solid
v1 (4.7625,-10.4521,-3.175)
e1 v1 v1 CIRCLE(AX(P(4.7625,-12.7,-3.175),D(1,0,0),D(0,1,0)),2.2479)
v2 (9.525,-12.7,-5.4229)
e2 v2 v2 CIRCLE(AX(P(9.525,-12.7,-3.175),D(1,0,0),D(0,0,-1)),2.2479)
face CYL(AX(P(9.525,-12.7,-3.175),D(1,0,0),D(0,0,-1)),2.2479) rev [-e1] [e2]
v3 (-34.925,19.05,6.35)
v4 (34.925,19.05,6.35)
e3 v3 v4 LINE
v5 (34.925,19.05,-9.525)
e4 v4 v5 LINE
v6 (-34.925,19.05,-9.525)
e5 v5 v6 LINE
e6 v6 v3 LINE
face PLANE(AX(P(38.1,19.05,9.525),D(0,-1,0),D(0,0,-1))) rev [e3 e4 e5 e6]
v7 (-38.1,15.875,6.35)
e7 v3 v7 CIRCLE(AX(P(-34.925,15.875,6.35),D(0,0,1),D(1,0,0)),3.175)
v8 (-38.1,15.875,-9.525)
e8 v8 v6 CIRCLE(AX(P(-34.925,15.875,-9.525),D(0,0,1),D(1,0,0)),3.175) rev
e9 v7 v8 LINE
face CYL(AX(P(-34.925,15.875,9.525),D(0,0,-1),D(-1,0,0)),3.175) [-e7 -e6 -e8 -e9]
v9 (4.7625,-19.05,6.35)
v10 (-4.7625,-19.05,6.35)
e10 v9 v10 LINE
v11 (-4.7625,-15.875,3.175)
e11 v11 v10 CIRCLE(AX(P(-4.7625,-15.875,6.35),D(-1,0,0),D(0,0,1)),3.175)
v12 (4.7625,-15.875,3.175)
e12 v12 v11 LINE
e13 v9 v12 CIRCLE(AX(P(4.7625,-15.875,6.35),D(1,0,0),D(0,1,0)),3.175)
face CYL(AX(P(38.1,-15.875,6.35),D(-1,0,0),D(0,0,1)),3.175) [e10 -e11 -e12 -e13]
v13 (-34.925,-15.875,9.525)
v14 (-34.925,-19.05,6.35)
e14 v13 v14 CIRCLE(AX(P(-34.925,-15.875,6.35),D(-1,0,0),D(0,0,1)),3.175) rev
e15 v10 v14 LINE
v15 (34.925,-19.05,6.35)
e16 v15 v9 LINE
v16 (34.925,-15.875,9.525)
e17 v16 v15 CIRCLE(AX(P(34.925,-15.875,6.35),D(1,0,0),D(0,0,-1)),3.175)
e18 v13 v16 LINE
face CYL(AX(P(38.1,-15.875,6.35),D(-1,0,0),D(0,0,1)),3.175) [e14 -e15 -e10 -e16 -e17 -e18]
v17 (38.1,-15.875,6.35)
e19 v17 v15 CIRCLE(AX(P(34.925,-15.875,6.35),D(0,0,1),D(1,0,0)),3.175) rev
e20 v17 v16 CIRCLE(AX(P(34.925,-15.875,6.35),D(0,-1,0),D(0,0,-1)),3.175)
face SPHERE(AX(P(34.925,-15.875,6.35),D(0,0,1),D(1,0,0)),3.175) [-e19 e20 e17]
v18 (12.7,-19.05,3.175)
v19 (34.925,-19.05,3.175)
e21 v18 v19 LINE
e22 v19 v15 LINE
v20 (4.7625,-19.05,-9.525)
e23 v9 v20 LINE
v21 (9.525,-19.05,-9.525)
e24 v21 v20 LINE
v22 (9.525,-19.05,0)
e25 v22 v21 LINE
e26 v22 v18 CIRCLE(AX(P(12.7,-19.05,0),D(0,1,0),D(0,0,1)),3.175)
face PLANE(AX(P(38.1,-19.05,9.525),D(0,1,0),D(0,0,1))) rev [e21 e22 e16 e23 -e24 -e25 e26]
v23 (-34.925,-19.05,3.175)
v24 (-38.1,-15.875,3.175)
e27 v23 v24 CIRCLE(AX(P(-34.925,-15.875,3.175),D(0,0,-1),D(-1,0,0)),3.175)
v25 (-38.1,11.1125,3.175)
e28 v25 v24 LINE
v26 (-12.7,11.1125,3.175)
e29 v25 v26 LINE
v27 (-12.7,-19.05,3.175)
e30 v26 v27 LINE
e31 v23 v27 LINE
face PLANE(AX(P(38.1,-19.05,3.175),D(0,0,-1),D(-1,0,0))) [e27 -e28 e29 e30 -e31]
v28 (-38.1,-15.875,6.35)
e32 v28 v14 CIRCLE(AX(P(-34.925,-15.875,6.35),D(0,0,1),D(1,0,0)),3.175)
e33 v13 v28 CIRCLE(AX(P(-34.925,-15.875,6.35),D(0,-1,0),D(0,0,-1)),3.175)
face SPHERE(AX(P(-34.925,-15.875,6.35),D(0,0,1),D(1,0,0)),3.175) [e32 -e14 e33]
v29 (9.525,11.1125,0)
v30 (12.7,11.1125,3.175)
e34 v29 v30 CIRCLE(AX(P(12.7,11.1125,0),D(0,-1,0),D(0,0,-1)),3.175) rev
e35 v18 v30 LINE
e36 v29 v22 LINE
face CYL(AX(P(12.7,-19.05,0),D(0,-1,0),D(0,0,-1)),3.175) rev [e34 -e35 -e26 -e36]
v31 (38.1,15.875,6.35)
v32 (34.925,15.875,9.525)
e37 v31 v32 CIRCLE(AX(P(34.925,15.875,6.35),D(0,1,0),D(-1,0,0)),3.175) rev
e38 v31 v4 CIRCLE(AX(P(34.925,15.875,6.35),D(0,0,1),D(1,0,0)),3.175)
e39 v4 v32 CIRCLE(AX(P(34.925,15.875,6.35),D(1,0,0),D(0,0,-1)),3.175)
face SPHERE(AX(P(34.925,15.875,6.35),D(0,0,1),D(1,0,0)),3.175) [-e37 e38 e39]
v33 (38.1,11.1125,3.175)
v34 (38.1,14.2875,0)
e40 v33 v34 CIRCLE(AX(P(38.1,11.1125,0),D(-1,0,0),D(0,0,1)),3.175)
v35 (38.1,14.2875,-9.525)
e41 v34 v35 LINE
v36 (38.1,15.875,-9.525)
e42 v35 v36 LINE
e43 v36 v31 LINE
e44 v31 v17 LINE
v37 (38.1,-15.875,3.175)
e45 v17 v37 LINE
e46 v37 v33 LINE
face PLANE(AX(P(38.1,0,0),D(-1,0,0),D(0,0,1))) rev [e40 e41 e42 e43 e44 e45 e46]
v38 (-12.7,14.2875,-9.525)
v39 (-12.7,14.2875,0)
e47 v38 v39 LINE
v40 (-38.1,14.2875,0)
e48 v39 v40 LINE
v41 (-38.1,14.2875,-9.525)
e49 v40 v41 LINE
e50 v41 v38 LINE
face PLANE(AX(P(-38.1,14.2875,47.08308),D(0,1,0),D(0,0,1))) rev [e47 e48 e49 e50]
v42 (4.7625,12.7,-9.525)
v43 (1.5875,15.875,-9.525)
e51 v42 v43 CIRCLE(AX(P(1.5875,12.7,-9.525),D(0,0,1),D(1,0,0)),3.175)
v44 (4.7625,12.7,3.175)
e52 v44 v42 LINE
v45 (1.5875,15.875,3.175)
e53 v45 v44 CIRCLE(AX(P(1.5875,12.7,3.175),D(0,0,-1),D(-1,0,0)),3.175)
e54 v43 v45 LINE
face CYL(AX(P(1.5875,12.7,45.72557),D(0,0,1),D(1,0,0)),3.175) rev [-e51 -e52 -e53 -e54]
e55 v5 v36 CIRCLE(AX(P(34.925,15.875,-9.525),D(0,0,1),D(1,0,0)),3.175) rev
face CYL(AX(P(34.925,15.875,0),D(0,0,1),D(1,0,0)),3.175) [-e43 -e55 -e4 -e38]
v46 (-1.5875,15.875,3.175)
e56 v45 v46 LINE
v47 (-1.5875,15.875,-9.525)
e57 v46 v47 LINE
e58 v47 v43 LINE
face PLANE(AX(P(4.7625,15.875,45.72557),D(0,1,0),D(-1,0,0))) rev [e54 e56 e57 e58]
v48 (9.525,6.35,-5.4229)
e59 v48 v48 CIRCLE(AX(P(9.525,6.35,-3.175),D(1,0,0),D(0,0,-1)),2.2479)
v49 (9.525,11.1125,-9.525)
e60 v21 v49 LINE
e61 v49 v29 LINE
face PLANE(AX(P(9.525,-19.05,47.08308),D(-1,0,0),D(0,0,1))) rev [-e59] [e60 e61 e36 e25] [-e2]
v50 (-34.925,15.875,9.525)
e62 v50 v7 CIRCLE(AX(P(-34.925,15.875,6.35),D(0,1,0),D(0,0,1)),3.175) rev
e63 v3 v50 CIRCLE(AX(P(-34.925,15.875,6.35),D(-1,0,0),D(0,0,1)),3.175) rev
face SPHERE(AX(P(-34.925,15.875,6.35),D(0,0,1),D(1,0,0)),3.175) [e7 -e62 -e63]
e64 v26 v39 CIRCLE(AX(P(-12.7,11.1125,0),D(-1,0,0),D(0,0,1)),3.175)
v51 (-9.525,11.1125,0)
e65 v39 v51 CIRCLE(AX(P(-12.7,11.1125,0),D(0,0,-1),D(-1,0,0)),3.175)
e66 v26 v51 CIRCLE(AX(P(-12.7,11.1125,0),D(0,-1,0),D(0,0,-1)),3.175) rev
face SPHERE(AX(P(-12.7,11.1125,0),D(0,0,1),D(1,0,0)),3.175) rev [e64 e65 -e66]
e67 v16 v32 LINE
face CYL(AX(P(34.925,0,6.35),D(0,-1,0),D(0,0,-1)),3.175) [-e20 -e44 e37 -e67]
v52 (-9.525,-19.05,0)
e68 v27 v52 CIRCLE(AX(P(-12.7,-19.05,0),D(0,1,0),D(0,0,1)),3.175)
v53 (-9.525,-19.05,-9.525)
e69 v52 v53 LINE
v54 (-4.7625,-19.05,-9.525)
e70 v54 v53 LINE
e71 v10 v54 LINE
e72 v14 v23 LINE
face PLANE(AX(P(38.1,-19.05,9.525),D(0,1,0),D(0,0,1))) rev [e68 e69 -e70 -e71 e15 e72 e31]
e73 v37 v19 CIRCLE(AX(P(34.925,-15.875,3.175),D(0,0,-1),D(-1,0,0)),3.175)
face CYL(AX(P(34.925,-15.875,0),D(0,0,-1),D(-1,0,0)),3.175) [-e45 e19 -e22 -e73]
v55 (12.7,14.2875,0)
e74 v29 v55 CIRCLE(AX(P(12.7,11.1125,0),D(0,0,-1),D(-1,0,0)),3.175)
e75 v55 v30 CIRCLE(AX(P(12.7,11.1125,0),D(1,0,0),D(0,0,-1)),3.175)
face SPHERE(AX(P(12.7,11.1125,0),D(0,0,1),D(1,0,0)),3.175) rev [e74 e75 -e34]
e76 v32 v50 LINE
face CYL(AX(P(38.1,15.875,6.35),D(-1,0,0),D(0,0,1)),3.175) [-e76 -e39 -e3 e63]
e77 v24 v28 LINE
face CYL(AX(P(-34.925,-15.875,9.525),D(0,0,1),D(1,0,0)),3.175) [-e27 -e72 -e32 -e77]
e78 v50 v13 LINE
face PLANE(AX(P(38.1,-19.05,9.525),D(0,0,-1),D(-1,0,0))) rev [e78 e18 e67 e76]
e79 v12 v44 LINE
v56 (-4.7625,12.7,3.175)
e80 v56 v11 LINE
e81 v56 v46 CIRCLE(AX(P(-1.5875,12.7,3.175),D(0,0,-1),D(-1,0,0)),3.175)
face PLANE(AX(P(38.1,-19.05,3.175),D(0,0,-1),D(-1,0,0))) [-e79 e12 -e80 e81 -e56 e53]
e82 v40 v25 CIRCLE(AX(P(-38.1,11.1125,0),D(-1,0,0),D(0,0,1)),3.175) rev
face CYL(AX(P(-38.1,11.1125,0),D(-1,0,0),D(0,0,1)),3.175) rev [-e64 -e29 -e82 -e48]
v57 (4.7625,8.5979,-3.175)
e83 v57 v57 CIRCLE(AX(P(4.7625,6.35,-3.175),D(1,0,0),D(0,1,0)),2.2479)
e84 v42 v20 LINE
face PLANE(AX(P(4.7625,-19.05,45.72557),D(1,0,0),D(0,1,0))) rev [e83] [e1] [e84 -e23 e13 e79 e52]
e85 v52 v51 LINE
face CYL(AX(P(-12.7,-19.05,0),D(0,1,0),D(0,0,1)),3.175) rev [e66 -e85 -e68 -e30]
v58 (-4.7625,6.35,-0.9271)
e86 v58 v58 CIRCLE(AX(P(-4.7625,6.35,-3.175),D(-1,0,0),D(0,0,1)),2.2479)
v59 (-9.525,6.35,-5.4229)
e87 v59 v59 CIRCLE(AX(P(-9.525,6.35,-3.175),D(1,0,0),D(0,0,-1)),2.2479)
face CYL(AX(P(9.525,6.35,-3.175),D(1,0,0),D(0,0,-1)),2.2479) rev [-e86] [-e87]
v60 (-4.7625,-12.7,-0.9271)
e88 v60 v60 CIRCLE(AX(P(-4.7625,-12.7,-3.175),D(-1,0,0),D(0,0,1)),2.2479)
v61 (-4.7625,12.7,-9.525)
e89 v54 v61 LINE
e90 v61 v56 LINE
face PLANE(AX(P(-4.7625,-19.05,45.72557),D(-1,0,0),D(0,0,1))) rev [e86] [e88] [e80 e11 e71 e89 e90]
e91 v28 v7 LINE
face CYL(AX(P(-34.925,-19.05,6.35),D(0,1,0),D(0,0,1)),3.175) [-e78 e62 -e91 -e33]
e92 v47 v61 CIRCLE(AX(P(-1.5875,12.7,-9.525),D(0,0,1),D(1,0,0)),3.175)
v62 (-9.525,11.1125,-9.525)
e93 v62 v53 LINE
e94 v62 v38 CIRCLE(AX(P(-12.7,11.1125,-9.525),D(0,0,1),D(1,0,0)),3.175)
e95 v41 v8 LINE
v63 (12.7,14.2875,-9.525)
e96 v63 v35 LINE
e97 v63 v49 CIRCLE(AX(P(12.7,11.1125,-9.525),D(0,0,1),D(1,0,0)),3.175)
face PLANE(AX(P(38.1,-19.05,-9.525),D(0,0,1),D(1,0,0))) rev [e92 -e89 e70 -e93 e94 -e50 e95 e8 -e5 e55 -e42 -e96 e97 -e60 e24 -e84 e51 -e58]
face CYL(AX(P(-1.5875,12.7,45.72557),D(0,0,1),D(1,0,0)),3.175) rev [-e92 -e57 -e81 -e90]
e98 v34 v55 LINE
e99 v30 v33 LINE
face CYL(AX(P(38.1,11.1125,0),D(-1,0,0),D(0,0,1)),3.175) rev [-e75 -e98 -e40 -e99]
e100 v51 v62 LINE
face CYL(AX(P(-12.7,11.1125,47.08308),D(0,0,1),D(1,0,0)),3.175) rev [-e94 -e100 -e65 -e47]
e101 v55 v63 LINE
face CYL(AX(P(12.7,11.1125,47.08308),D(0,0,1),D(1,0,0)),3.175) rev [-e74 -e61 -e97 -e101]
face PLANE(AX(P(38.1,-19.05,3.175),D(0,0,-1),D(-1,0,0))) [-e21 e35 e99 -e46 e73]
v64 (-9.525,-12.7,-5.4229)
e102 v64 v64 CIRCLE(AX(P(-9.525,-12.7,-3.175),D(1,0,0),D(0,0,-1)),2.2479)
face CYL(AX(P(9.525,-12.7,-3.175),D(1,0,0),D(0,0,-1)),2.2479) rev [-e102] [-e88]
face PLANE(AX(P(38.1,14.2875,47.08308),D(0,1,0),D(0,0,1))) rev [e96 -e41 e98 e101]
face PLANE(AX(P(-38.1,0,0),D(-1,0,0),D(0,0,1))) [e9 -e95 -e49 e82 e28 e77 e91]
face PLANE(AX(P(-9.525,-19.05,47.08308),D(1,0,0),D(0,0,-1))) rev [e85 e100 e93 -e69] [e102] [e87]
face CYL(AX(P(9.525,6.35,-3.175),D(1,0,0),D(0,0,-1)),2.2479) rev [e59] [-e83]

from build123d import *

# Parameters (mm, degrees)
SKETCH1_W             = 19.05
SKETCH1_H             = 38.1
BOSS_EXTRUDE1_DEPTH   = 38.1
SKETCH2_W             = 9.525
SKETCH2_H             = 34.925
CUT_EXTRUDE1_DEPTH    = 12.7
SKETCH3_W             = 28.575
SKETCH3_H             = 33.3375
CUT_EXTRUDE2_DEPTH    = 12.7
FILLET1_R             = 3.175
F_8_CLEARANCE_HOLE1_D = 4.4958
FILLET2_R             = 3.175


with BuildPart() as part:
    # Sketch1 → Boss-Extrude1 (new, symmetric)
    with BuildSketch(Plane(origin=(0, 0, 0), x_dir=(0, 0, -1), z_dir=(1, 0, 0))):
        Rectangle(SKETCH1_W, SKETCH1_H)
    extrude(amount=BOSS_EXTRUDE1_DEPTH, both=True)

    # Sketch2 → Cut-Extrude1 (cut)
    with BuildSketch(Plane(origin=(0, 0, -9.525), x_dir=(-1, 0, 0), z_dir=(0, 0, -1))):
        with Locations((0, -1.5875)):
            Rectangle(SKETCH2_W, SKETCH2_H)
    extrude(amount=-CUT_EXTRUDE1_DEPTH, mode=Mode.SUBTRACT)

    # Sketch3 → Cut-Extrude2 (cut)
    with BuildSketch(Plane(origin=(0, 0, -9.525), x_dir=(-1, 0, 0), z_dir=(0, 0, -1))):
        with Locations((-23.8125, -2.38125)):
            Rectangle(SKETCH3_W, SKETCH3_H)
        with Locations((23.8125, -2.38125)):
            Rectangle(SKETCH3_W, SKETCH3_H)
    extrude(amount=-CUT_EXTRUDE2_DEPTH, mode=Mode.SUBTRACT)

    # Fillet1
    fillet1_edges = [part.edges().sort_by_distance(p)[0] for p in [
        (38.1, 0, 9.525),
        (38.1, -19.05, 6.35),
        (4.7625, 15.875, -3.175),
        (-4.7625, 15.875, -3.175),
        (9.525, 14.2875, -3.175),
        (23.8125, 14.2875, 3.175),
        (9.525, -2.38125, 3.175),
        (-9.525, 14.2875, -3.175),
        (-9.525, -2.38125, 3.175),
        (-23.8125, 14.2875, 3.175),
        (-38.1, -19.05, 6.35),
        (-38.1, 0, 9.525),
        (-38.1, 19.05, 0),
        (38.1, 19.05, 0),
        (0, -19.05, 9.525),
        (0, 19.05, 9.525),
    ]]
    fillet(fillet1_edges, radius=FILLET1_R)

    # #8 Clearance Hole1 (through all)
    with Locations(Plane(origin=(9.525, 0, 0), x_dir=(0, 0, -1), z_dir=(1, 0, 0))):
        with Locations((3.175, -12.7), (3.175, 6.35)):
            Hole(F_8_CLEARANCE_HOLE1_D / 2)

    # Fillet2
    fillet2_edges = [part.edges().sort_by_distance(p)[0] for p in [
        (0, -19.05, 3.175),
    ]]
    fillet(fillet2_edges, radius=FILLET2_R - 0.0001)  # a hair under: the kernel refuses the full size


solid = part.part
